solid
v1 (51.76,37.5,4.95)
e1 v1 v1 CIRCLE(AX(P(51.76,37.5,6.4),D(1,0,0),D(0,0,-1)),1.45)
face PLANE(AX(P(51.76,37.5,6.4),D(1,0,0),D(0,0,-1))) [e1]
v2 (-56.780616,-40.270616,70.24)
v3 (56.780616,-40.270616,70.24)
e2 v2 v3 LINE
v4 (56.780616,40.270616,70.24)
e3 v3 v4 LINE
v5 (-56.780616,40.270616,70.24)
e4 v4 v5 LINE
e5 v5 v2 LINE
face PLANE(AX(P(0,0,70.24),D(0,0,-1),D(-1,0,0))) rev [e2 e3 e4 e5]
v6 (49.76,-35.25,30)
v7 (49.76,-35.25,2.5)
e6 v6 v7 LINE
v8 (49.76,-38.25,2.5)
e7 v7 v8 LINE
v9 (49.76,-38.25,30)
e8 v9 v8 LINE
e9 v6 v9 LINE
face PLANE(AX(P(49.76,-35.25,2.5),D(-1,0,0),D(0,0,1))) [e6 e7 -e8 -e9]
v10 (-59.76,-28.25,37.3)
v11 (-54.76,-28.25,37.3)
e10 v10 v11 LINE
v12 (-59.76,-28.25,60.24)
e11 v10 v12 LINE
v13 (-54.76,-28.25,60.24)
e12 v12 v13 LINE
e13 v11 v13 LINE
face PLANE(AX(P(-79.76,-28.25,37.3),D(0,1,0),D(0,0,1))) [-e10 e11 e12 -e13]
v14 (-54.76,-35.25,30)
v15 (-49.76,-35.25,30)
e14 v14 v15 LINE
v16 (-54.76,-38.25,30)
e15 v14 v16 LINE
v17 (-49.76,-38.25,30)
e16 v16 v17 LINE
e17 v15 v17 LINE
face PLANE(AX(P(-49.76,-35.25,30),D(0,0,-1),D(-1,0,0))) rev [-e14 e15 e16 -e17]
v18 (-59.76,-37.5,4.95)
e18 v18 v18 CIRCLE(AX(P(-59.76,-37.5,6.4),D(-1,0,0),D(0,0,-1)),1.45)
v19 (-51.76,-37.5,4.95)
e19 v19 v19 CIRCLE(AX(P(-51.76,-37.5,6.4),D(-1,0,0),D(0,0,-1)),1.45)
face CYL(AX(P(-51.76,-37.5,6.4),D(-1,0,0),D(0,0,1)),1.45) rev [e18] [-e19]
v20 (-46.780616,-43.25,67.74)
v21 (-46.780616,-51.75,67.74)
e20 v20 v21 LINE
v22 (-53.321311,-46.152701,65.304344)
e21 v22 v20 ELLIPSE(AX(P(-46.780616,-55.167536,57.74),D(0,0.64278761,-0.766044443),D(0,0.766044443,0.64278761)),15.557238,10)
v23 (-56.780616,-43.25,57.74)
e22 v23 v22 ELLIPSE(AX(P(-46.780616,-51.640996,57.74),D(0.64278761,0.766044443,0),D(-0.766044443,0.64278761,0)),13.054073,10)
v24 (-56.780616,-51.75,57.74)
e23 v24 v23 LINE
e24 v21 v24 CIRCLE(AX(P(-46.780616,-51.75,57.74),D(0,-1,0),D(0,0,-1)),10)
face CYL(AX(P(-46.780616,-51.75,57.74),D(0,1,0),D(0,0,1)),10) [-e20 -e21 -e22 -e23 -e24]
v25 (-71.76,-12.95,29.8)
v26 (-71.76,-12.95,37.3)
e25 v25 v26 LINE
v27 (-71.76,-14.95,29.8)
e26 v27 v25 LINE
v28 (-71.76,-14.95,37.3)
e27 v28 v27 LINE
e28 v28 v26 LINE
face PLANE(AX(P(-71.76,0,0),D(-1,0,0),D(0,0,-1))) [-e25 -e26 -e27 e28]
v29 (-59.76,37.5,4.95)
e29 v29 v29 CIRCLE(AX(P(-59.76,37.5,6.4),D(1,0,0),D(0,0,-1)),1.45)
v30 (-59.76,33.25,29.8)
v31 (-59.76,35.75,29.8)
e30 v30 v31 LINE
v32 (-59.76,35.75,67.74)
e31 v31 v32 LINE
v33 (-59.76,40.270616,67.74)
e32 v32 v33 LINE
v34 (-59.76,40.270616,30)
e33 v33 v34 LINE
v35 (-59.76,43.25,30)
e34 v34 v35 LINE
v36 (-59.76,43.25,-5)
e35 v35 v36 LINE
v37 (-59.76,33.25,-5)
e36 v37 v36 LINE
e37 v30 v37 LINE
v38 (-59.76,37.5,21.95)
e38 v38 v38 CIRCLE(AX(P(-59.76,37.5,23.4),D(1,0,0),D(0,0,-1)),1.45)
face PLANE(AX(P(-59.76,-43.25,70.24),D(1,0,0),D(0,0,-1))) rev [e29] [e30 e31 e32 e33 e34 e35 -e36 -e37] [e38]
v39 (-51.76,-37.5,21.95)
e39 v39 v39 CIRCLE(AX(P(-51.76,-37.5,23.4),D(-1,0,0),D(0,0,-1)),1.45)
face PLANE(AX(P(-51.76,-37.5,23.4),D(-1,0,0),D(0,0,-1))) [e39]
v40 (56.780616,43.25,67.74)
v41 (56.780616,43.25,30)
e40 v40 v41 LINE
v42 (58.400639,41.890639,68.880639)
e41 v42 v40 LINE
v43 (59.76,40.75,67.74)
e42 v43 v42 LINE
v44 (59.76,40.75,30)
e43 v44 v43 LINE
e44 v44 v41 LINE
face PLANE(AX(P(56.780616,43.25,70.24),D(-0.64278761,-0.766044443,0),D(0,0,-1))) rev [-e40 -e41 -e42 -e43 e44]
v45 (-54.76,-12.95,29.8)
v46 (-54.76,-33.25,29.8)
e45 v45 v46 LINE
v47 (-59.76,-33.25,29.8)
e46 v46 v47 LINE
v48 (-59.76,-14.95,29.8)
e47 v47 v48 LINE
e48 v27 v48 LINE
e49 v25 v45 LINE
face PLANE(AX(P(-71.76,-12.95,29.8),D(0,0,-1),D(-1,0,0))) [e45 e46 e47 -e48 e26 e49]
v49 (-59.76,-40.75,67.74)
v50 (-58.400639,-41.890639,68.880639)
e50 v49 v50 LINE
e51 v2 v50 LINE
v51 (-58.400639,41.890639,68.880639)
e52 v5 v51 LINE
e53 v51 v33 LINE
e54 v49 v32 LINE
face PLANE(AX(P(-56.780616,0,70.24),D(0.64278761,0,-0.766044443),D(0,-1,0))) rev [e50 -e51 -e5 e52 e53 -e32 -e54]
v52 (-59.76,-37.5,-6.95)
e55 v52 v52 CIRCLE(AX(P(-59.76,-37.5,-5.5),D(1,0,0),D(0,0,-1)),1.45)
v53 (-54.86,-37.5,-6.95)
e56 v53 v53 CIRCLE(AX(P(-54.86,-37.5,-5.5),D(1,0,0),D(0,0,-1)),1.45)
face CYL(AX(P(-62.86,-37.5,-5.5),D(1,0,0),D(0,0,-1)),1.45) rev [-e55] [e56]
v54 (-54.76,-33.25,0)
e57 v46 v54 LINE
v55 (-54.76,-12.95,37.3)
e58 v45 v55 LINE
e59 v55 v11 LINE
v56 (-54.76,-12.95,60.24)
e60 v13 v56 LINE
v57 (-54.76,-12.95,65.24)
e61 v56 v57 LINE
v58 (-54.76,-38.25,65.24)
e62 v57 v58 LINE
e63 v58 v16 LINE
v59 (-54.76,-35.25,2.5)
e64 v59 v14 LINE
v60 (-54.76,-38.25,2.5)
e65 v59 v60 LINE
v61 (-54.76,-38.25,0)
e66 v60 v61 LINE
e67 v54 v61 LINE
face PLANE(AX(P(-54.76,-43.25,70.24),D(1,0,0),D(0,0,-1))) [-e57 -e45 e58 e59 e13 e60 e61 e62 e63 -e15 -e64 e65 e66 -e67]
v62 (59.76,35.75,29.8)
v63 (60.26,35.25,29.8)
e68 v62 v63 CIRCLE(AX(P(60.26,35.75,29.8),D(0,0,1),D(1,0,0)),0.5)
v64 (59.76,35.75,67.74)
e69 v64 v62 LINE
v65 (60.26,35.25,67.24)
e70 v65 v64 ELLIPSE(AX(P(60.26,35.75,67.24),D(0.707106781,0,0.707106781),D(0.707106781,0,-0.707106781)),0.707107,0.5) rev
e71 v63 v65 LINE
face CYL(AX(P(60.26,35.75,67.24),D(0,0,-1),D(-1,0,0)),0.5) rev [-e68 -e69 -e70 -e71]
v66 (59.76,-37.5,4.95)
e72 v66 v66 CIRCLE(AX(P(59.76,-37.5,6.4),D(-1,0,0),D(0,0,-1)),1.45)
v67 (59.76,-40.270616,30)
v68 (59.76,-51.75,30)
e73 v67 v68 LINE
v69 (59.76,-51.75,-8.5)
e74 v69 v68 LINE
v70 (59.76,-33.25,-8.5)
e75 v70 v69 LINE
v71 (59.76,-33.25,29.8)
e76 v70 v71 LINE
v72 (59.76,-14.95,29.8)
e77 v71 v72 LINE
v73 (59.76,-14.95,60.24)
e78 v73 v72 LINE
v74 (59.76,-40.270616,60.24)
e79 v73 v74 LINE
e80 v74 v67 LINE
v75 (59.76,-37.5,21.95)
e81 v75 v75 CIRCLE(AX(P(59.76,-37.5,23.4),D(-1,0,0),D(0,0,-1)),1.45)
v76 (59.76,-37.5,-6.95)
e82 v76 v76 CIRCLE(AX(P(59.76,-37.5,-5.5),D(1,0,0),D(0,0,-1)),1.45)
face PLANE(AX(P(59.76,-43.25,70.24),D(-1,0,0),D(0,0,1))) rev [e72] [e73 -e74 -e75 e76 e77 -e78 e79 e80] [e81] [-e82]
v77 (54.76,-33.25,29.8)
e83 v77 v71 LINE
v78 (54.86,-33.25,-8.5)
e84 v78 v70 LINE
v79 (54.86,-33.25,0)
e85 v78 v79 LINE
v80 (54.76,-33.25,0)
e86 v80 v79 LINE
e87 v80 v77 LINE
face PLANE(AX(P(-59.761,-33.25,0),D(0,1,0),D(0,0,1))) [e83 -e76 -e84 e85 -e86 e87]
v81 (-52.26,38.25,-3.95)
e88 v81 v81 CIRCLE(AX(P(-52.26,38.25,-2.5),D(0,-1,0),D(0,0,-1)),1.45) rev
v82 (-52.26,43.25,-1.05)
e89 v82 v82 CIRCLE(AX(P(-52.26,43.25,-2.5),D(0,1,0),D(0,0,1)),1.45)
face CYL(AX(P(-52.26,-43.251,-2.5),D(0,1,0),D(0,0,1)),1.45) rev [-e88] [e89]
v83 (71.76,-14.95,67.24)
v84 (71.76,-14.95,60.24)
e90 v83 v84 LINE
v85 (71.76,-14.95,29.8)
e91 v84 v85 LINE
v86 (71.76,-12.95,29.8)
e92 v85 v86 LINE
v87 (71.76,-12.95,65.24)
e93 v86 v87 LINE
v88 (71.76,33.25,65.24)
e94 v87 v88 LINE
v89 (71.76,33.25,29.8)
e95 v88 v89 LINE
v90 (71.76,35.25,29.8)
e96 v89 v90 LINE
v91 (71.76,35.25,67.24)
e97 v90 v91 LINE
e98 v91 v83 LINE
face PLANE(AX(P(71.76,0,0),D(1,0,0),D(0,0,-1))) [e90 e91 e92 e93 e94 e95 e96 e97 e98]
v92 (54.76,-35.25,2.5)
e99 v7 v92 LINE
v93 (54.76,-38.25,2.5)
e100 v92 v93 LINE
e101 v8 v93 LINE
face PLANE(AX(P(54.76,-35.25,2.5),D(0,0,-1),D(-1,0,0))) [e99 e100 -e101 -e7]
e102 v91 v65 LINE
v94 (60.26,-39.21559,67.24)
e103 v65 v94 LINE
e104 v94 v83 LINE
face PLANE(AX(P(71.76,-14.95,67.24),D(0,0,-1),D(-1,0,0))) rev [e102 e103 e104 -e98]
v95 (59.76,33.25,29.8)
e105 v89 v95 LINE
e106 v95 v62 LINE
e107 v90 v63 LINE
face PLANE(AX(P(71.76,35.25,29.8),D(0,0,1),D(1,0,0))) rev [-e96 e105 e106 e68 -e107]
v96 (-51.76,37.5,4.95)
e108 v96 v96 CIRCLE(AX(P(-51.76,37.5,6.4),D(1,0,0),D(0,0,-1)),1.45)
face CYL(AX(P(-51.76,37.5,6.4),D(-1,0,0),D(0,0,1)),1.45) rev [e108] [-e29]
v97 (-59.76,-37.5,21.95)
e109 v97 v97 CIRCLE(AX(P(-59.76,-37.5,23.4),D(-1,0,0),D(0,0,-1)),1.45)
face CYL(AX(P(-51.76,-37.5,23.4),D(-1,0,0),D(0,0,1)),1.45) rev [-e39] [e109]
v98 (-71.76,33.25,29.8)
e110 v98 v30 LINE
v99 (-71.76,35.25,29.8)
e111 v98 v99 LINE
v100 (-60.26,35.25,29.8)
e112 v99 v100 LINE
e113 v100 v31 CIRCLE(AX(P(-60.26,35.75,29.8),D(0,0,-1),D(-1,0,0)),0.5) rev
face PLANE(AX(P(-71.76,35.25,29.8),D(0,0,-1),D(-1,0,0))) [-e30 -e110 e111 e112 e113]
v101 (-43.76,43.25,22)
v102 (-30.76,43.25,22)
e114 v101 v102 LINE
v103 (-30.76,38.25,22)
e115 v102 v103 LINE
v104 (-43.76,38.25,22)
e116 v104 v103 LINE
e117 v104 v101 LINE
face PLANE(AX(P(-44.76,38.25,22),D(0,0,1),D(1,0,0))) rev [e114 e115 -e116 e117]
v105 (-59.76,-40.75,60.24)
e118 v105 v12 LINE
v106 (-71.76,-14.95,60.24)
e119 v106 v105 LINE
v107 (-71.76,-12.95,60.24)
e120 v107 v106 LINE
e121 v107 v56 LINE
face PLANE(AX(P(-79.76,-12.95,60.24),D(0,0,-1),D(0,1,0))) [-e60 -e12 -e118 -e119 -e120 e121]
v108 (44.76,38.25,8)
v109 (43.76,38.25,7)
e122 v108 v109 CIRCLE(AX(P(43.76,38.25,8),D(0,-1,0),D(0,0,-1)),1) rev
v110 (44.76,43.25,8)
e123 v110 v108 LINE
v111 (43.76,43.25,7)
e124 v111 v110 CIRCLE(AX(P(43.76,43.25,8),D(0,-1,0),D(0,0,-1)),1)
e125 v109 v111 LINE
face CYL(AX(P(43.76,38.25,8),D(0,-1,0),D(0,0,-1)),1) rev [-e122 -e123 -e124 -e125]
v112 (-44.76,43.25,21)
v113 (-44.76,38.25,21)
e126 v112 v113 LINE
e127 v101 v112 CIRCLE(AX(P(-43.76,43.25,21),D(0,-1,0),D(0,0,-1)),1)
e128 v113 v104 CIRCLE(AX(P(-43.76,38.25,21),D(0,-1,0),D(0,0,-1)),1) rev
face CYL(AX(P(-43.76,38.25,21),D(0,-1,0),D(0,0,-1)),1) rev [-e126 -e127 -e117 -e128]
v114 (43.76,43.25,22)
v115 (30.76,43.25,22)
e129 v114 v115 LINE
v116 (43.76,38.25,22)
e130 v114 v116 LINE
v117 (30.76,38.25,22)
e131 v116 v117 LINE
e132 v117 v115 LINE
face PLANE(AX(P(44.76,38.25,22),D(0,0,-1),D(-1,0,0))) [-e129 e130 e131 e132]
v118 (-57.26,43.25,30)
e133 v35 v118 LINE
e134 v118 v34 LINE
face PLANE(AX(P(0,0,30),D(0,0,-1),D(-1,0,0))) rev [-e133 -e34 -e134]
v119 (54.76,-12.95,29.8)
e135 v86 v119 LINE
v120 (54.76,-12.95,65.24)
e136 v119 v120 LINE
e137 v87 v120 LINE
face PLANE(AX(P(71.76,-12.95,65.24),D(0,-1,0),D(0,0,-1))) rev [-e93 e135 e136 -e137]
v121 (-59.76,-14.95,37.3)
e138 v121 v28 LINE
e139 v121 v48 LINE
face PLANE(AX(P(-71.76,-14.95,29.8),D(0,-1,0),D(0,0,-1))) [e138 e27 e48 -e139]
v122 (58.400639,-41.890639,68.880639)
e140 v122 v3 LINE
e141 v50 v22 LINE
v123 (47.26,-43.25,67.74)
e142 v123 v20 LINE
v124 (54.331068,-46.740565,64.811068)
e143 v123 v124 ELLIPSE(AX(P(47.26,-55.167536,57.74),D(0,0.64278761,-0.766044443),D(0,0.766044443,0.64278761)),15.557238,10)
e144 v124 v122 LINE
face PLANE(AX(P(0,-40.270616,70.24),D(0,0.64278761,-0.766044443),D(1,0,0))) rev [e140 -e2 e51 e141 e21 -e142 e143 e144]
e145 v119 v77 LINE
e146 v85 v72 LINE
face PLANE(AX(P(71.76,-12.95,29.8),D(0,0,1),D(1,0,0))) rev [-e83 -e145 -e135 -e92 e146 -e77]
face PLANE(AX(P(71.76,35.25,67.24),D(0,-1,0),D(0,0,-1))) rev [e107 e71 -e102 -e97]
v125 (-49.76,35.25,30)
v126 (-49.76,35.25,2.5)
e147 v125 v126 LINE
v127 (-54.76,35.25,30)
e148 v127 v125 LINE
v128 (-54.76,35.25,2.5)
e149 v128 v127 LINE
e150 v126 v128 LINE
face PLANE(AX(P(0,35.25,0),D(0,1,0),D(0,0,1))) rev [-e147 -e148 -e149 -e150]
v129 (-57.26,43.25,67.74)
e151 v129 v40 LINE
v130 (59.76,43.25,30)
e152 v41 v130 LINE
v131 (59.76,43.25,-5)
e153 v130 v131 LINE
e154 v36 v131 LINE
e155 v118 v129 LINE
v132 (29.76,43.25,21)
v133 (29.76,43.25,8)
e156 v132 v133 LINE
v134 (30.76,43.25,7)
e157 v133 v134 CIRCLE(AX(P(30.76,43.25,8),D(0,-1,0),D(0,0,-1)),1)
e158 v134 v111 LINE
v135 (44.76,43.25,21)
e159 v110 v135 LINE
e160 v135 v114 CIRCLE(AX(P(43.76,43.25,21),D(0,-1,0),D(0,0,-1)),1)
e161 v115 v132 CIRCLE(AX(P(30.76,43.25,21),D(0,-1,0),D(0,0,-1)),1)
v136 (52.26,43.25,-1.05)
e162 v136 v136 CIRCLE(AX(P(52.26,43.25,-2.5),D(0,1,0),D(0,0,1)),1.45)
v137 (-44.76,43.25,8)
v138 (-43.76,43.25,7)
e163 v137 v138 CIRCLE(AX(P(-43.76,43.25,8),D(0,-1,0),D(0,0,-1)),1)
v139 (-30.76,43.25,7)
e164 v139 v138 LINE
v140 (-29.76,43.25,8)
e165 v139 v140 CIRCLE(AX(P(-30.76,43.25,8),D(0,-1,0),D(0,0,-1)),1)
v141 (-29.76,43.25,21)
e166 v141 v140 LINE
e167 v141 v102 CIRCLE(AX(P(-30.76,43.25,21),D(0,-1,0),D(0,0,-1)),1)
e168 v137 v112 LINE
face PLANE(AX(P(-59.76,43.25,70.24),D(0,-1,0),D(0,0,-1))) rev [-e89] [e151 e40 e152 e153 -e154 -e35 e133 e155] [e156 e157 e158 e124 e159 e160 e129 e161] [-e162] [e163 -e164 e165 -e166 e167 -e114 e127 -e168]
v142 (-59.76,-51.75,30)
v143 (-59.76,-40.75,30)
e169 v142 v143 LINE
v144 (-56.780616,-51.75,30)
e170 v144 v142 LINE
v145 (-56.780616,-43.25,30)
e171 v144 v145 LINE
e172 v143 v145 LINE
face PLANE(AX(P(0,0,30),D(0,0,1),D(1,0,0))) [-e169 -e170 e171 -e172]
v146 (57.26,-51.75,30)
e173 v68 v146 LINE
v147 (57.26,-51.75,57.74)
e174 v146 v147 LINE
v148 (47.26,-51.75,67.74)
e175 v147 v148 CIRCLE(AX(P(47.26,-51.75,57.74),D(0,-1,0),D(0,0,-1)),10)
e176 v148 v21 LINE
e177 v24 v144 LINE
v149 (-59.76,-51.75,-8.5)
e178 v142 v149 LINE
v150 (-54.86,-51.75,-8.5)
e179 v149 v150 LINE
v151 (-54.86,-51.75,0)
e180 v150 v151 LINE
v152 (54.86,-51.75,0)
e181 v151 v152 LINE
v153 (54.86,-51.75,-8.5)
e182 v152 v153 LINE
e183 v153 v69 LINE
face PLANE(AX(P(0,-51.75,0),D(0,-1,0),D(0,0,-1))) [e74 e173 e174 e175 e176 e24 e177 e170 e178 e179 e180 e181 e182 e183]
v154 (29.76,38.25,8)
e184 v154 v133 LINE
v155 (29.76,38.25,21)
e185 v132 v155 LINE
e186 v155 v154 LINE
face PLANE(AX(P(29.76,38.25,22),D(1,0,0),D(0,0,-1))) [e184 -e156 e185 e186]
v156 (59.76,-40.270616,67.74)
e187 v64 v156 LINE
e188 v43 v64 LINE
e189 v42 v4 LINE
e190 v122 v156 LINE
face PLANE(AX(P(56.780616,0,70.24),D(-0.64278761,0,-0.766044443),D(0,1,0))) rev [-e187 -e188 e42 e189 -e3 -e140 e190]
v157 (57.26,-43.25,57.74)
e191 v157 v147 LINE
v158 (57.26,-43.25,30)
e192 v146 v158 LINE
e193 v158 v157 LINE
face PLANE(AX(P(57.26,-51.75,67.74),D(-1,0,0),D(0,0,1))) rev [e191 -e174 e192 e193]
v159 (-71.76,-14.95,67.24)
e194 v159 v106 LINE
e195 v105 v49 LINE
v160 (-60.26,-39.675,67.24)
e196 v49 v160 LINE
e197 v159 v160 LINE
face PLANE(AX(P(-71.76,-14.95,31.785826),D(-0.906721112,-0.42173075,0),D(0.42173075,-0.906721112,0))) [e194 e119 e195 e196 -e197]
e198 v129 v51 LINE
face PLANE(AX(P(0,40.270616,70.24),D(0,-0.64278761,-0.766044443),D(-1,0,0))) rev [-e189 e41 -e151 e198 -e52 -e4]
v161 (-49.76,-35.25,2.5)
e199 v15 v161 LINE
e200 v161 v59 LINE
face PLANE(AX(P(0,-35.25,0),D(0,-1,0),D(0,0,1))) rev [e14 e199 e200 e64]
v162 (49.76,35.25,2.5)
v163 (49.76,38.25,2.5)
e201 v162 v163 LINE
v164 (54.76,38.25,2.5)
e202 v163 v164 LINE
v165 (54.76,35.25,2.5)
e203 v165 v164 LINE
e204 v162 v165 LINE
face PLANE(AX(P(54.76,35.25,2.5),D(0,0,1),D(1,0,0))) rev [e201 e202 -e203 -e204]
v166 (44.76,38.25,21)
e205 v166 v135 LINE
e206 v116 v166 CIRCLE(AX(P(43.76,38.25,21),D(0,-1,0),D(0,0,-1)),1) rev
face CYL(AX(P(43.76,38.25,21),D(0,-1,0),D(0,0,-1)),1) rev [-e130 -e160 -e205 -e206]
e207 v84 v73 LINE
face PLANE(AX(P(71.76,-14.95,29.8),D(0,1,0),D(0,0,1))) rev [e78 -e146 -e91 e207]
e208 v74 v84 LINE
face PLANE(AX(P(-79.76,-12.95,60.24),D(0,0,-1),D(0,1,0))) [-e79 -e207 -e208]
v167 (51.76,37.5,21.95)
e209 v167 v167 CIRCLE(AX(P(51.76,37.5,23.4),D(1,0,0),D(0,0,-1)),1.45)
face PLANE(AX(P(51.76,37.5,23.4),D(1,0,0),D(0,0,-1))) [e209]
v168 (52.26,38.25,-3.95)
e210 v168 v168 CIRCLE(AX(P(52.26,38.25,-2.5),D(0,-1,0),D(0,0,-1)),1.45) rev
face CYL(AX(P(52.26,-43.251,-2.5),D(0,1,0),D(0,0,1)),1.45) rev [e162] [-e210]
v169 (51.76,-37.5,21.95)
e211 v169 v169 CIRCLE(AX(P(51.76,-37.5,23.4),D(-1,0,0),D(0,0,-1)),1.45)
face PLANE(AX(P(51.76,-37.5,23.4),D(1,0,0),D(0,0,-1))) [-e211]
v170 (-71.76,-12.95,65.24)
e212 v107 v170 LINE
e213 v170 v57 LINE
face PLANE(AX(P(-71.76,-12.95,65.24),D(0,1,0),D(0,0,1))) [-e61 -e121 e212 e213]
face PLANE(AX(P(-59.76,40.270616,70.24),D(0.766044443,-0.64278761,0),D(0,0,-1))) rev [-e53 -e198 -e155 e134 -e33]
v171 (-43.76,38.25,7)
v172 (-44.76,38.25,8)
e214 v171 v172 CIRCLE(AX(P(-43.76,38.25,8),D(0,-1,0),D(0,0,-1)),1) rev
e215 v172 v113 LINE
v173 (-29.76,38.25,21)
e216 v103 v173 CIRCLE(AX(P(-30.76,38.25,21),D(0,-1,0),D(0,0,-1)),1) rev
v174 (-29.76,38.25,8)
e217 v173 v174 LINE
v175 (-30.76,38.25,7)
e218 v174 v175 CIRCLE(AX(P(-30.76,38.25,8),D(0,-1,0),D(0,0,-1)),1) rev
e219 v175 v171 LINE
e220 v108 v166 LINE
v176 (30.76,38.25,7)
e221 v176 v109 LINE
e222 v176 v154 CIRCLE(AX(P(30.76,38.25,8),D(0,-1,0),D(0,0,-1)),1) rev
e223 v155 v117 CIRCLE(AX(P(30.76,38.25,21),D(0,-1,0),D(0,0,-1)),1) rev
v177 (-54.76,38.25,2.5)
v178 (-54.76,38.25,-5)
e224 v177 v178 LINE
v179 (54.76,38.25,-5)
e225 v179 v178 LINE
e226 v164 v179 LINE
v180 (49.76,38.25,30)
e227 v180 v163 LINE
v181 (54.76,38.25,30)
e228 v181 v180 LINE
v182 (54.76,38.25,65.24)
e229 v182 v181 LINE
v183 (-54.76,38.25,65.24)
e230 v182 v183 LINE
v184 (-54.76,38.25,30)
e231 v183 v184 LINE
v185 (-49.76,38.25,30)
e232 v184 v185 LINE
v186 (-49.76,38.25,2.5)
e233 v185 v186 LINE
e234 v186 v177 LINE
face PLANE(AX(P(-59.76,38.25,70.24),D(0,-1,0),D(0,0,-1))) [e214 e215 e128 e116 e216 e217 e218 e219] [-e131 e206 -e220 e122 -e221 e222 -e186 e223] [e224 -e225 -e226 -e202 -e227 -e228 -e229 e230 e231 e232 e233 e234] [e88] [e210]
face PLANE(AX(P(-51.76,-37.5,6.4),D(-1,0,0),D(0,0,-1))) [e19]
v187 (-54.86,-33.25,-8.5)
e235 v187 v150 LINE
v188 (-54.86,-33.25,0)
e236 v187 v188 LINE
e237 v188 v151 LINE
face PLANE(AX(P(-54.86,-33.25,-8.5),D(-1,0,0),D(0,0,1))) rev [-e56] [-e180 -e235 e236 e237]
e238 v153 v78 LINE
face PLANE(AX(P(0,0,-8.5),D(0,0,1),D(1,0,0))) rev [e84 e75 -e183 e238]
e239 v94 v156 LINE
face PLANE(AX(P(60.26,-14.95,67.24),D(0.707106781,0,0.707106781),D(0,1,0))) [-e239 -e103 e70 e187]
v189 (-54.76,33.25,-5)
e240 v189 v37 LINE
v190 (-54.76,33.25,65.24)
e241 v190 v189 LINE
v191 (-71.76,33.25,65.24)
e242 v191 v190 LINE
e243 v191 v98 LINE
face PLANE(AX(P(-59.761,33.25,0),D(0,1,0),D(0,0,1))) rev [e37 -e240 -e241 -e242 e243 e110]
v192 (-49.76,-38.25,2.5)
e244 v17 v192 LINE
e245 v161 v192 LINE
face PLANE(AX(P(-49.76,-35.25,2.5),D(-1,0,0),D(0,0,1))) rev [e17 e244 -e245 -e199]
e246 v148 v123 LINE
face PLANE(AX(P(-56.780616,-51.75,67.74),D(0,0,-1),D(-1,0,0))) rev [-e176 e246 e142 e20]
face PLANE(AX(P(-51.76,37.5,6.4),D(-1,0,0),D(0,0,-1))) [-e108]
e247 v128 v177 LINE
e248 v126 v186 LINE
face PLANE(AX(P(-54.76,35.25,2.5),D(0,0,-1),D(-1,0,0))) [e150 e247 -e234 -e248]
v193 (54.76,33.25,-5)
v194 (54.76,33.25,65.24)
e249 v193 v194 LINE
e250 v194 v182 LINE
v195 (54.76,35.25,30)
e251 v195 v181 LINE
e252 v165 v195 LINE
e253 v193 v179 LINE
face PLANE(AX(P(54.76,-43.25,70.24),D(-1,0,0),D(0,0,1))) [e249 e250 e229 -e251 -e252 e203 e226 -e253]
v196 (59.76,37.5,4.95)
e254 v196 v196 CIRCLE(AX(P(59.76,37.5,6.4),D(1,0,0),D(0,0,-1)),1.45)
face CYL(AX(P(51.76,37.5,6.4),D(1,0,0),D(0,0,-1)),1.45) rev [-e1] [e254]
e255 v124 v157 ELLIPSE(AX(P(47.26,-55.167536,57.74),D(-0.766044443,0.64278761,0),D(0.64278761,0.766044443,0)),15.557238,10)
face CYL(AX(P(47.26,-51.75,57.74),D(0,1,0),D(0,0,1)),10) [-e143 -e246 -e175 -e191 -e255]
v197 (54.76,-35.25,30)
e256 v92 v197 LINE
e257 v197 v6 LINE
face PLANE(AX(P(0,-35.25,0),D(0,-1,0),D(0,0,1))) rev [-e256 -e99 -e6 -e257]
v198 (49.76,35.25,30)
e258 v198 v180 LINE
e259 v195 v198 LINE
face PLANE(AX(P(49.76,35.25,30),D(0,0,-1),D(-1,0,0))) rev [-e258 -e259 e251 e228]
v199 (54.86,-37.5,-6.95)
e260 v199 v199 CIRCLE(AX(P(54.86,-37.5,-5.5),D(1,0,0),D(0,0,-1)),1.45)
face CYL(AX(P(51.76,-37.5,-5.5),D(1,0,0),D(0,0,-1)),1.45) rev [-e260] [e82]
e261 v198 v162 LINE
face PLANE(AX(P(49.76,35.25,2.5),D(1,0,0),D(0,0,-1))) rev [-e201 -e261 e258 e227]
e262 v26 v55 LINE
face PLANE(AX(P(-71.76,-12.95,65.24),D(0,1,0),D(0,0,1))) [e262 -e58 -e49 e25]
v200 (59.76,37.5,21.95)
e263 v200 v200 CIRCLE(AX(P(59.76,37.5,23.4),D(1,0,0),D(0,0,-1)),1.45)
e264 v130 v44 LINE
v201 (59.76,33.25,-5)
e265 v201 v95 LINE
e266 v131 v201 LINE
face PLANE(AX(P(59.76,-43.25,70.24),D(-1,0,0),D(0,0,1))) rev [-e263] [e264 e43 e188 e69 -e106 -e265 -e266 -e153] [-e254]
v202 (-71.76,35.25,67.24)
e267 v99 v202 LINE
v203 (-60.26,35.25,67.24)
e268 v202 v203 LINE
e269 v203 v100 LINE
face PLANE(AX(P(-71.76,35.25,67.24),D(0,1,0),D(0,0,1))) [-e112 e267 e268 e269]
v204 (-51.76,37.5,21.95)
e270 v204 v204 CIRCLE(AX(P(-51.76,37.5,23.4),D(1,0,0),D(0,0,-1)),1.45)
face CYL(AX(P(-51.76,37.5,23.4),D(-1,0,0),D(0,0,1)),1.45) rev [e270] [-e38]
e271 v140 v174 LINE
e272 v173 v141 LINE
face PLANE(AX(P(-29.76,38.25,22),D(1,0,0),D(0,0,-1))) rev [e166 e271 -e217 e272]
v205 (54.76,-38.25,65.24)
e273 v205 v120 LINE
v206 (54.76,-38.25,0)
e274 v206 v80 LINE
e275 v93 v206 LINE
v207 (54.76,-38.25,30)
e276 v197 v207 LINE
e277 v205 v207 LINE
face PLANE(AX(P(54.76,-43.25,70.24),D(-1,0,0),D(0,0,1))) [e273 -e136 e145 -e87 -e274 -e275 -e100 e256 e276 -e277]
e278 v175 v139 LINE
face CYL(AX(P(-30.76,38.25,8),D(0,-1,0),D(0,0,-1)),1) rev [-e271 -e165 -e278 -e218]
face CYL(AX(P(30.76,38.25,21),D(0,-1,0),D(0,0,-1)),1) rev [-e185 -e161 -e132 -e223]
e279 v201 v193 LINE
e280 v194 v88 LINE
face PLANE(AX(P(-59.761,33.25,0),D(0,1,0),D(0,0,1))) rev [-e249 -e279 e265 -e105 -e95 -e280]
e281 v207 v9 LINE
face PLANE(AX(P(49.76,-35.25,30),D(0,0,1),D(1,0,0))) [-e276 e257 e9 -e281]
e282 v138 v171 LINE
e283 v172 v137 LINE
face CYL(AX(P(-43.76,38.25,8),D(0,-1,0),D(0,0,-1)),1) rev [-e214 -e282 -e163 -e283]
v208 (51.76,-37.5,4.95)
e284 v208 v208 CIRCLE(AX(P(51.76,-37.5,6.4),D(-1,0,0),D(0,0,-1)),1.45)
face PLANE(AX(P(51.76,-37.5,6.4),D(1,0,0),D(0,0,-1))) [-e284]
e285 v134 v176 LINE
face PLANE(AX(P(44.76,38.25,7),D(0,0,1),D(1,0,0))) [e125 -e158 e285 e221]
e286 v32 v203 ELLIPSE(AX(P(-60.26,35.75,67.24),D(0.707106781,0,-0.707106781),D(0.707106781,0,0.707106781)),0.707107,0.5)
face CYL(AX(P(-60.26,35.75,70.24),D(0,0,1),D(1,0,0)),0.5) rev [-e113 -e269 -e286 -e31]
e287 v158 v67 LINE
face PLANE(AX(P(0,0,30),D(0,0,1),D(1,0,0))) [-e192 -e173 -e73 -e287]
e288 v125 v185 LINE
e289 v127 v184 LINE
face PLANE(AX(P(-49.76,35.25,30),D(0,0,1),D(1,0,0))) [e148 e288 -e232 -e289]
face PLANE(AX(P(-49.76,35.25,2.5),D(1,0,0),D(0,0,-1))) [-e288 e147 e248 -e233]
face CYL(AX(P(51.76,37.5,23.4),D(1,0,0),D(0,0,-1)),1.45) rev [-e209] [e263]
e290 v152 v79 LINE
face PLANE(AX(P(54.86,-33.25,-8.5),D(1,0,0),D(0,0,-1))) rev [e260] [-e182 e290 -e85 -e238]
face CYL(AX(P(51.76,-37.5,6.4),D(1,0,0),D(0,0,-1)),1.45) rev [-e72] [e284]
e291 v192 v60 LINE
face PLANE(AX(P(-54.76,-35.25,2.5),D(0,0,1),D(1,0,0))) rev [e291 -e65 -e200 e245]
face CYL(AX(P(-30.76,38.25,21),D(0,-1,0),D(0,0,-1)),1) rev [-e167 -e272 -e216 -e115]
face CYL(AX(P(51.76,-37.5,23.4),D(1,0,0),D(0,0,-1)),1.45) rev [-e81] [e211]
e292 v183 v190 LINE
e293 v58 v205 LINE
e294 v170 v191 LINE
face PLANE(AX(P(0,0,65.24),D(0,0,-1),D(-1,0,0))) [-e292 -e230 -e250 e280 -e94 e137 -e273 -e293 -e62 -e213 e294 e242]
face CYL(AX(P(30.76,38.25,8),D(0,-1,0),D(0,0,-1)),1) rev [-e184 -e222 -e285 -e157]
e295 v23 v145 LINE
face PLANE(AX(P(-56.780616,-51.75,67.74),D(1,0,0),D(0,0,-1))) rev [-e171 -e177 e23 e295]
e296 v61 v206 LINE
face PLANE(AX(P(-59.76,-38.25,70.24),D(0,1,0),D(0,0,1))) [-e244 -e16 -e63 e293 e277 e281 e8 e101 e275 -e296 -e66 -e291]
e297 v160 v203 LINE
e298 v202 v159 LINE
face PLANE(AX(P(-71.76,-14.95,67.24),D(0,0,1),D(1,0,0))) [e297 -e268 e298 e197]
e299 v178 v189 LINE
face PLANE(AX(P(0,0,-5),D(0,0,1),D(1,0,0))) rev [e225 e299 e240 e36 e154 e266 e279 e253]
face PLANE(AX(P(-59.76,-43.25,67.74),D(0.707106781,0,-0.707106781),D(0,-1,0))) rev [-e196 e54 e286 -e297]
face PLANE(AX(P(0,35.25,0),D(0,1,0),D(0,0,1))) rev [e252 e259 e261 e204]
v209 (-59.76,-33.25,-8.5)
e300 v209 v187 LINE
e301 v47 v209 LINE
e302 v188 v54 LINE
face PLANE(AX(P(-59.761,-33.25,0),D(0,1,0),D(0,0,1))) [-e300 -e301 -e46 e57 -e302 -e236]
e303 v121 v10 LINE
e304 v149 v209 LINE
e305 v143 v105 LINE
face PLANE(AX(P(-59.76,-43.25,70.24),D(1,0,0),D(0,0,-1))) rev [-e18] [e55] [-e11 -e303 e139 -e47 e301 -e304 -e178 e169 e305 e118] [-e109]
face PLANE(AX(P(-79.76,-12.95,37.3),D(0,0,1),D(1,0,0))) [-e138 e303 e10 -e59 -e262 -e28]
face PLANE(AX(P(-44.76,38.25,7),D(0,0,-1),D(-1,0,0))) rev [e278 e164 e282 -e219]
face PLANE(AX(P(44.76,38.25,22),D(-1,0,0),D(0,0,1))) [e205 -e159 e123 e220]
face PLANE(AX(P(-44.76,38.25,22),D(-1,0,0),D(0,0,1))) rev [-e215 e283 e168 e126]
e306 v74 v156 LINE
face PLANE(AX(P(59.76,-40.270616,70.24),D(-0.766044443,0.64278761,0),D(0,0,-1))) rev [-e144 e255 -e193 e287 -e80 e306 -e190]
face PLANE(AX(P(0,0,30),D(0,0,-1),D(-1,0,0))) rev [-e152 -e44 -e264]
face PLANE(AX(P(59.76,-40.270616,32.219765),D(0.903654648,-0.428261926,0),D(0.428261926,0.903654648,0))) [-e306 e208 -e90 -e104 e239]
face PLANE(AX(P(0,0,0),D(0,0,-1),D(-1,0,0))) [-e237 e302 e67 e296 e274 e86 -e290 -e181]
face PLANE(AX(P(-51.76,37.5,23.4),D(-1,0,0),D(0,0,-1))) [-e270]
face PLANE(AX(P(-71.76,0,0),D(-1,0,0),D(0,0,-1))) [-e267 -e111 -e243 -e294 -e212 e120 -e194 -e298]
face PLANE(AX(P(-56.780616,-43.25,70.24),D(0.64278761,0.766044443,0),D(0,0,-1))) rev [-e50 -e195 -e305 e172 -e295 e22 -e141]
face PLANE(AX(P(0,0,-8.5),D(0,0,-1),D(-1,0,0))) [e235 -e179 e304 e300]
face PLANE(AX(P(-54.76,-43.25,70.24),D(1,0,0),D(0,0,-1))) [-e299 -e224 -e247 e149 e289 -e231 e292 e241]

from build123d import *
from OCP.BRepFilletAPI import BRepFilletAPI_MakeChamfer

# Parameters (mm, degrees)
SKETCH1_W                                  = 119.52
SKETCH1_H                                  = 86.5
BOSS_EXTRUDE1_DEPTH                        = 70.24
SHELL1_T                                   = -5
CHAMFER1_SIZE                              = 2.5
CHAMFER1_SIZE2                             = 2.979383981
CHAMFER2_SIZE                              = 2.5
CHAMFER2_SIZE2                             = 2.979383981
CHAMFER3_SIZE                              = 2.5
CHAMFER3_SIZE2                             = 2.979383981
CUT_EXTRUDE1_START                         = -119.52
CUT_EXTRUDE1_OUTLINE_W                     = 67.74
CUT_EXTRUDE1_OUTLINE_H                     = 66.5
CUT_EXTRUDE1_DEPTH                         = 119.52
SKETCH4_W                                  = 109.52
SKETCH4_H                                  = 5
BOSS_EXTRUDE2_DEPTH                        = 5
CUT_EXTRUDE2_REACH                         = 128.44
SKETCH5_R                                  = 1.45
BOSS_EXTRUDE3_DEPTH                        = 8.5
BOSS_EXTRUDE4_DEPTH                        = 5
BOSS_EXTRUDE6_DEPTH                        = 35
BOSS_EXTRUDE7_DEPTH                        = 8.5
BOSS_EXTRUDE8_DEPTH                        = 35
BOSS_EXTRUDE9_DEPTH                        = 38.5
SKETCH16_W                                 = 5
SKETCH16_H                                 = 27.5
BOSS_EXTRUDE10_DEPTH                       = 3
MIRROR7_COPY_1_SKETCH_W                    = 5
MIRROR7_COPY_1_SKETCH_H                    = 27.5
MIRROR7_COPY_1_DEPTH                       = 3
SKETCH15_R                                 = 1.45
CUT_EXTRUDE5_DEPTH                         = 8
MIRROR8_AT_THE_SECOND_PLANE_COPY_1_SKETC_R = 1.45
MIRROR8_AT_THE_SECOND_PLANE_COPY_1_DEPTH   = 8
SKETCH17_R                                 = 1.45
CUT_EXTRUDE6_DEPTH                         = 8
SKETCH18_R                                 = 1.45
CUT_EXTRUDE7_DEPTH                         = 8
SKETCH19_W                                 = 15
SKETCH19_H                                 = 15
CUT_EXTRUDE8_DEPTH                         = 5
FILLET2_R                                  = 1
FILLET2_OF_MIRROR10_R                      = 1
BOSS_EXTRUDE11_DEPTH                       = 8.5
FILLET3_R                                  = 10
SKETCH21_W                                 = 119.52
SKETCH21_H                                 = 66.5
BOSS_EXTRUDE12_DEPTH                       = 2.5
BOSS_EXTRUDE13_DEPTH                       = 12
SKETCH23_W                                 = 5
SKETCH23_H                                 = 20.3
BOSS_EXTRUDE14_DEPTH                       = 35.44
CUT_EXTRUDE9_DEPTH                         = 20
CUT_EXTRUDE9_DEPTH_BACK                    = 10
SKETCH24_W                                 = 22.94
SKETCH24_H                                 = 15.3
BOSS_EXTRUDE15_DEPTH                       = 7
CHAMFER9_SIZE                              = 0.5
BOSS_EXTRUDE16_DEPTH                       = 7
CHAMFER10_SIZE                             = 0.5
FILLET4_R                                  = 0.5
FILLET5_R                                  = 0.5


# Read off the part's stored shape, not the designer's step: Cut-Extrude1
with BuildPart() as part:
    # Sketch1 → Boss-Extrude1 (new body)
    with BuildSketch(Plane.XY):
        Rectangle(SKETCH1_W, SKETCH1_H)
    extrude(amount=BOSS_EXTRUDE1_DEPTH)

    # Shell1
    shell1_openings = [part.faces().sort_by_distance(p)[0] for p in [
        (0, 0, 0),
    ]]
    offset(amount=SHELL1_T, openings=shell1_openings, kind=Kind.INTERSECTION)

    # Chamfer1: one chamfer whose edges measure the first distance from different faces: ONE call of the kernel's chamfer builder (chamfer() names one face for all edges)
    chamfer1_edges_1 = [part.edges().sort_by_distance(p)[0] for p in [
        (59.76, 0, 70.24),
    ]]
    chamfer1_side_1 = [part.faces().sort_by_distance(p)[0] for p in [
        (59.76, 0, 35.12),
    ]]
    chamfer1_edges_2 = [part.edges().sort_by_distance(p)[0] for p in [
        (0, 43.25, 70.24),
    ]]
    chamfer1_side_2 = [part.faces().sort_by_distance(p)[0] for p in [
        (0, 43.25, 35.12),
    ]]
    chamfer1_edges_3 = [part.edges().sort_by_distance(p)[0] for p in [
        (-59.76, 0, 70.24),
    ]]
    chamfer1_side_3 = [part.faces().sort_by_distance(p)[0] for p in [
        (-59.76, 0, 35.12),
    ]]
    chamfer1_edges_4 = [part.edges().sort_by_distance(p)[0] for p in [
        (0, -43.25, 70.24),
    ]]
    chamfer1_side_4 = [part.faces().sort_by_distance(p)[0] for p in [
        (0, -43.25, 35.12),
    ]]
    chamfer1 = BRepFilletAPI_MakeChamfer(part.part.solid().wrapped)
    for e in chamfer1_edges_1:
        chamfer1.Add(CHAMFER1_SIZE, CHAMFER1_SIZE2, e.wrapped, chamfer1_side_1[0].wrapped)  # the first distance lies on this face
    for e in chamfer1_edges_2:
        chamfer1.Add(CHAMFER1_SIZE, CHAMFER1_SIZE2, e.wrapped, chamfer1_side_2[0].wrapped)  # the first distance lies on this face
    for e in chamfer1_edges_3:
        chamfer1.Add(CHAMFER1_SIZE, CHAMFER1_SIZE2, e.wrapped, chamfer1_side_3[0].wrapped)  # the first distance lies on this face
    for e in chamfer1_edges_4:
        chamfer1.Add(CHAMFER1_SIZE, CHAMFER1_SIZE2, e.wrapped, chamfer1_side_4[0].wrapped)  # the first distance lies on this face
    add(Compound.cast(chamfer1.Shape()), mode=Mode.REPLACE)

    # Chamfer2
    chamfer2_edges = [part.edges().sort_by_distance(p)[0] for p in [
        (-59.76, 43.25, 33.87),
    ]]
    chamfer2_side = [part.faces().sort_by_distance(p)[0] for p in [
        (0, 43.25, 33.87),
    ]]
    chamfer(chamfer2_edges, length=CHAMFER2_SIZE, length2=CHAMFER2_SIZE2, reference=chamfer2_side[0])

    # Chamfer3: one chamfer whose edges measure the first distance from different faces: ONE call of the kernel's chamfer builder (chamfer() names one face for all edges)
    chamfer3_edges_1 = [part.edges().sort_by_distance(p)[0] for p in [
        (59.76, -43.25, 33.87),
    ]]
    chamfer3_side_1 = [part.faces().sort_by_distance(p)[0] for p in [
        (0, -43.25, 33.87),
    ]]
    chamfer3_edges_2 = [part.edges().sort_by_distance(p)[0] for p in [
        (-59.76, -43.25, 33.87),
    ]]
    chamfer3_side_2 = [part.faces().sort_by_distance(p)[0] for p in [
        (-59.76, -1.489691991, 33.87),
    ]]
    chamfer3_edges_3 = [part.edges().sort_by_distance(p)[0] for p in [
        (59.76, 43.25, 33.87),
    ]]
    chamfer3_side_3 = [part.faces().sort_by_distance(p)[0] for p in [
        (59.76, 0, 33.87),
    ]]
    chamfer3 = BRepFilletAPI_MakeChamfer(part.part.solid().wrapped)
    for e in chamfer3_edges_1:
        chamfer3.Add(CHAMFER3_SIZE, CHAMFER3_SIZE2, e.wrapped, chamfer3_side_1[0].wrapped)  # the first distance lies on this face
    for e in chamfer3_edges_2:
        chamfer3.Add(CHAMFER3_SIZE, CHAMFER3_SIZE2, e.wrapped, chamfer3_side_2[0].wrapped)  # the first distance lies on this face
    for e in chamfer3_edges_3:
        chamfer3.Add(CHAMFER3_SIZE, CHAMFER3_SIZE2, e.wrapped, chamfer3_side_3[0].wrapped)  # the first distance lies on this face
    add(Compound.cast(chamfer3.Shape()), mode=Mode.REPLACE)

    # Cut-Extrude1 outline → Cut-Extrude1 (cut)
    with BuildSketch(Plane(origin=(59.76, 0, 0), x_dir=(0, 0, -1), z_dir=(1, 0, 0)).offset(CUT_EXTRUDE1_START)):
        with Locations((-33.87, 0)):
            Rectangle(CUT_EXTRUDE1_OUTLINE_W, CUT_EXTRUDE1_OUTLINE_H)
    extrude(amount=CUT_EXTRUDE1_DEPTH, mode=Mode.SUBTRACT)

    # Sketch4 → Boss-Extrude2 (add)
    with BuildSketch(Plane(origin=(0, 0, 0), x_dir=(-1, 0, 0), z_dir=(0, 0, -1))):
        with Locations((0, 40.75)):
            Rectangle(SKETCH4_W, SKETCH4_H)
    extrude(amount=BOSS_EXTRUDE2_DEPTH)

    # Sketch5 → Cut-Extrude2 (cut, up to next)
    with BuildSketch(Plane(origin=(0, 43.25, 0), x_dir=(1, 0, 0), z_dir=(0, 1, 0)), mode=Mode.PRIVATE) as cut_extrude2_sk1:
        with Locations(Location((-52.26, 2.5, 0), (0, 0, 270))):
            Circle(SKETCH5_R)
    cut_extrude2_tool1 = extrude(cut_extrude2_sk1.sketch, amount=-CUT_EXTRUDE2_REACH, mode=Mode.PRIVATE) & part.part
    # Sketch5 → Cut-Extrude2 (cut, up to next)
    with BuildSketch(Plane(origin=(0, 43.25, 0), x_dir=(1, 0, 0), z_dir=(0, 1, 0)), mode=Mode.PRIVATE) as cut_extrude2_sk2:
        with Locations(Location((52.26, 2.5, 0), (0, 0, 270))):
            Circle(SKETCH5_R)
    cut_extrude2_tool2 = extrude(cut_extrude2_sk2.sketch, amount=-CUT_EXTRUDE2_REACH, mode=Mode.PRIVATE) & part.part
    add(cut_extrude2_tool1.solids().sort_by_distance((-52.26, 43.25, -2.5))[0], mode=Mode.SUBTRACT)
    add(cut_extrude2_tool2.solids().sort_by_distance((52.26, 43.25, -2.5))[0], mode=Mode.SUBTRACT)

    # Sketch6 → Boss-Extrude3 (add)
    with BuildSketch(Plane(origin=(0, 0, 0), x_dir=(-1, 0, 0), z_dir=(0, 0, -1))):
        Polygon((-59.76, -33.25), (-54.86, -33.25), (-54.86, -43.25), (-57.26, -43.25), (-59.76, -40.270616019), align=None)
    extrude(amount=BOSS_EXTRUDE3_DEPTH)

    # Sketch8 → Boss-Extrude4 (add)
    with BuildSketch(Plane(origin=(0, 0, 0), x_dir=(-1, 0, 0), z_dir=(0, 0, -1))):
        Polygon((57.26, 43.25), (54.76, 43.25), (54.76, 38.25), (54.76, 33.25), (59.76, 33.25), (59.76, 40.270616019), align=None)
        Polygon((-54.76, 33.25), (-54.76, 38.25), (-54.76, 43.25), (-56.780616019, 43.25), (-59.76, 40.75), (-59.76, 33.25), align=None)
    extrude(amount=BOSS_EXTRUDE4_DEPTH)

    # Sketch10 → Boss-Extrude6 (add)
    with BuildSketch(Plane(origin=(0, 0, -5), x_dir=(-1, 0, 0), z_dir=(0, 0, -1))):
        Polygon((-59.76, 40.75), (-59.76, 43.25), (-56.780616019, 43.25), align=None)
    extrude(amount=-BOSS_EXTRUDE6_DEPTH)

    # Sketch11 → Boss-Extrude7 (add)
    with BuildSketch(Plane(origin=(0, 0, 0), x_dir=(-1, 0, 0), z_dir=(0, 0, -1))):
        Polygon((59.76, -33.25), (54.86, -33.25), (54.86, -43.25), (56.780616019, -43.25), (59.76, -40.75), align=None)
    extrude(amount=BOSS_EXTRUDE7_DEPTH)

    # Sketch13 → Boss-Extrude8 (add)
    with BuildSketch(Plane(origin=(0, 0, -5), x_dir=(-1, 0, 0), z_dir=(0, 0, -1))):
        Polygon((57.26, 43.25), (59.76, 43.25), (59.76, 40.270616019), align=None)
    extrude(amount=-BOSS_EXTRUDE8_DEPTH)

    # Sketch14 → Boss-Extrude9 (add)
    with BuildSketch(Plane(origin=(0, 0, -8.5), x_dir=(-1, 0, 0), z_dir=(0, 0, -1))):
        Polygon((-59.76, -40.270616019), (-59.76, -43.25), (-57.26, -43.25), align=None)
        Polygon((59.76, -40.75), (59.76, -43.25), (56.780616019, -43.25), align=None)
    extrude(amount=-BOSS_EXTRUDE9_DEPTH)

    # Sketch16 → Boss-Extrude10 (add)
    with BuildSketch(Plane.XZ.offset(-38.25)):
        with Locations((52.26, 16.25)):
            Rectangle(SKETCH16_W, SKETCH16_H)
    boss_extrude10 = extrude(amount=BOSS_EXTRUDE10_DEPTH)

    # Mirror6: Boss-Extrude10 across plane
    add(boss_extrude10.mirror(Plane(origin=(0, 0, 0), x_dir=(0, 0, 1), z_dir=(1, 0, 0))))

    # Mirror7: Boss-Extrude10 across plane
    add(boss_extrude10.mirror(Plane.ZX))

    # Mirror7 copy 1 sketch → Mirror7 copy 1 (add)
    with BuildSketch(Plane(origin=(0, -38.25, 0), x_dir=(-1, 0, 0), z_dir=(0, 1, 0))):
        with Locations((52.26, 16.25)):
            Rectangle(MIRROR7_COPY_1_SKETCH_W, MIRROR7_COPY_1_SKETCH_H)
    extrude(amount=MIRROR7_COPY_1_DEPTH)

    # Sketch15 → Cut-Extrude5 (cut)
    with BuildSketch(Plane(origin=(59.76, 0, 0), x_dir=(0, 0, -1), z_dir=(1, 0, 0))):
        with Locations((-6.4, 37.5)):
            Circle(SKETCH15_R)
        with Locations((-23.4, 37.5)):
            Circle(SKETCH15_R)
    cut_extrude5 = extrude(amount=-CUT_EXTRUDE5_DEPTH, mode=Mode.SUBTRACT)

    # Mirror8: Cut-Extrude5 across plane
    add(cut_extrude5.mirror(Plane.ZX), mode=Mode.SUBTRACT)

    # Mirror8 at the second plane: Cut-Extrude5 across plane
    add(cut_extrude5.mirror(Plane(origin=(0, 0, 0), x_dir=(0, 0, 1), z_dir=(1, 0, 0))), mode=Mode.SUBTRACT)

    # Mirror8 at the second plane copy 1 sketc → Mirror8 at the second plane copy 1 (cut)
    with BuildSketch(Plane(origin=(-59.76, 0, 0), x_dir=(0, 0, -1), z_dir=(-1, 0, 0))):
        with Locations((-6.4, 37.5)):
            Circle(MIRROR8_AT_THE_SECOND_PLANE_COPY_1_SKETC_R)
        with Locations((-23.4, 37.5)):
            Circle(MIRROR8_AT_THE_SECOND_PLANE_COPY_1_SKETC_R)
    extrude(amount=-MIRROR8_AT_THE_SECOND_PLANE_COPY_1_DEPTH, mode=Mode.SUBTRACT)

    # Sketch17 → Cut-Extrude6 (cut)
    with BuildSketch(Plane(origin=(59.76, 0, 0), x_dir=(0, 0, -1), z_dir=(1, 0, 0))):
        with Locations((5.5, -37.5)):
            Circle(SKETCH17_R)
    extrude(amount=-CUT_EXTRUDE6_DEPTH, mode=Mode.SUBTRACT)

    # Sketch18 → Cut-Extrude7 (cut)
    with BuildSketch(Plane(origin=(-54.86, 0, 0), x_dir=(0, 0, -1), z_dir=(1, 0, 0))):
        with Locations((5.5, -37.5)):
            Circle(SKETCH18_R)
    extrude(amount=-CUT_EXTRUDE7_DEPTH, mode=Mode.SUBTRACT)

    # Sketch19 → Cut-Extrude8 (cut)
    with BuildSketch(Plane(origin=(0, 43.25, 0), x_dir=(1, 0, 0), z_dir=(0, 1, 0))):
        with Locations((-37.26, -14.5)):
            Rectangle(SKETCH19_W, SKETCH19_H)
    cut_extrude8 = extrude(amount=-CUT_EXTRUDE8_DEPTH, mode=Mode.SUBTRACT)

    # Fillet2
    fillet2_edges = [part.edges().sort_by_distance(p)[0] for p in [
        (-44.76, 40.75, 22),
        (-44.76, 40.75, 7),
        (-29.76, 40.75, 7),
        (-29.76, 40.75, 22),
    ]]
    fillet(fillet2_edges, radius=FILLET2_R)

    # Mirror10: Cut-Extrude8 across plane
    add(cut_extrude8.mirror(Plane(origin=(0, 0, 0), x_dir=(0, 0, 1), z_dir=(1, 0, 0))), mode=Mode.SUBTRACT)

    # Fillet2 of Mirror10
    fillet2_of_mirror10_edges = [part.edges().sort_by_distance(p)[0] for p in [
        (44.76, 40.75, 22),
        (44.76, 40.75, 7),
        (29.76, 40.75, 7),
        (29.76, 40.75, 22),
    ]]
    fillet(fillet2_of_mirror10_edges, radius=FILLET2_OF_MIRROR10_R)

    # Sketch20 → Boss-Extrude11 (add)
    with BuildSketch(Plane.XZ.offset(43.25)):
        Polygon((-56.780616019, 67.74), (57.26, 67.74), (57.26, 30), (59.76, 30), (59.76, 0), (59.76, -8.5), (54.86, -8.5), (54.86, 0), (-54.86, 0), (-54.86, -8.5), (-59.76, -8.5), (-59.76, 0), (-59.76, 30), (-56.780616019, 30), align=None)
    extrude(amount=BOSS_EXTRUDE11_DEPTH)

    # Fillet3
    fillet3_edges = [part.edges().sort_by_distance(p)[0] for p in [
        (-56.780616019, -47.5, 67.74),
        (57.26, -47.5, 67.74),
    ]]
    fillet(fillet3_edges, radius=FILLET3_R)

    # Sketch21 → Boss-Extrude12 (add)
    with BuildSketch(Plane(origin=(0, 0, 67.74), x_dir=(-1, 0, 0), z_dir=(0, 0, -1))):
        Rectangle(SKETCH21_W, SKETCH21_H)
    extrude(amount=BOSS_EXTRUDE12_DEPTH)

    # Sketch22 → Boss-Extrude13 (add)
    with BuildSketch(Plane(origin=(59.76, 0, 0), x_dir=(0, 0, -1), z_dir=(1, 0, 0))):
        Polygon((-65.24, 33.25), (-29.8, 33.25), (-29.8, 35.25), (-67.24, 35.25), (-67.24, -14.95), (-29.8, -14.95), (-29.8, -12.95), (-65.24, -12.95), align=None)
    boss_extrude13 = extrude(amount=BOSS_EXTRUDE13_DEPTH)

    # Sketch23 → Boss-Extrude14 (add)
    with BuildSketch(Plane(origin=(0, 0, 65.24), x_dir=(-1, 0, 0), z_dir=(0, 0, -1))):
        with Locations((-57.26, -23.1)):
            Rectangle(SKETCH23_W, SKETCH23_H)
    boss_extrude14 = extrude(amount=BOSS_EXTRUDE14_DEPTH)

    # Mirror12: Boss-Extrude13, Boss-Extrude14 across plane
    add(boss_extrude13.mirror(Plane(origin=(0, 0, 0), x_dir=(0, 0, 1), z_dir=(1, 0, 0))))
    add(boss_extrude14.mirror(Plane(origin=(0, 0, 0), x_dir=(0, 0, 1), z_dir=(1, 0, 0))))

    # Sketch24 → Cut-Extrude9 (cut, two sides: drawn at the far end of the back side and taken through both)
    with BuildSketch(Plane.ZY.offset(59.76).offset(-CUT_EXTRUDE9_DEPTH_BACK)):
        with Locations((48.77, -20.6)):
            Rectangle(SKETCH24_W, SKETCH24_H)
    extrude(amount=CUT_EXTRUDE9_DEPTH + CUT_EXTRUDE9_DEPTH_BACK, mode=Mode.SUBTRACT)

    # Sketch25 → Boss-Extrude15 (add)
    with BuildSketch(Plane.XY.offset(67.24)):
        Polygon((-71.76, -14.95), (-59.76, -40.75), (-59.76, -14.95), align=None)
    extrude(amount=-BOSS_EXTRUDE15_DEPTH)

    # Chamfer9
    chamfer9_edges = [part.edges().sort_by_distance(p)[0] for p in [
        (-59.76, -2.75, 67.24),
    ]]
    chamfer(chamfer9_edges, length=CHAMFER9_SIZE - 0.0001)  # a hair under: the kernel refuses the full size

    # Sketch29 → Boss-Extrude16 (add)
    with BuildSketch(Plane.XY.offset(67.24)):
        Polygon((71.76, -14.95), (59.76, -14.95), (59.76, -40.270616019), align=None)
    extrude(amount=-BOSS_EXTRUDE16_DEPTH)

    # Chamfer10
    chamfer10_edges = [part.edges().sort_by_distance(p)[0] for p in [
        (59.76, -2.510308009, 67.24),
    ]]
    chamfer(chamfer10_edges, length=CHAMFER10_SIZE - 0.0001)  # a hair under: the kernel refuses the full size

    # Fillet4
    fillet4_edges = [part.edges().sort_by_distance(p)[0] for p in [
        (-59.76, 35.25, 48.76995),
    ]]
    fillet(fillet4_edges, radius=FILLET4_R - 0.0001)  # a hair under: the kernel refuses the full size

    # Fillet5
    fillet5_edges = [part.edges().sort_by_distance(p)[0] for p in [
        (59.76, 35.25, 48.76995),
    ]]
    fillet(fillet5_edges, radius=FILLET5_R - 0.0001)  # a hair under: the kernel refuses the full size


solid = part.part
